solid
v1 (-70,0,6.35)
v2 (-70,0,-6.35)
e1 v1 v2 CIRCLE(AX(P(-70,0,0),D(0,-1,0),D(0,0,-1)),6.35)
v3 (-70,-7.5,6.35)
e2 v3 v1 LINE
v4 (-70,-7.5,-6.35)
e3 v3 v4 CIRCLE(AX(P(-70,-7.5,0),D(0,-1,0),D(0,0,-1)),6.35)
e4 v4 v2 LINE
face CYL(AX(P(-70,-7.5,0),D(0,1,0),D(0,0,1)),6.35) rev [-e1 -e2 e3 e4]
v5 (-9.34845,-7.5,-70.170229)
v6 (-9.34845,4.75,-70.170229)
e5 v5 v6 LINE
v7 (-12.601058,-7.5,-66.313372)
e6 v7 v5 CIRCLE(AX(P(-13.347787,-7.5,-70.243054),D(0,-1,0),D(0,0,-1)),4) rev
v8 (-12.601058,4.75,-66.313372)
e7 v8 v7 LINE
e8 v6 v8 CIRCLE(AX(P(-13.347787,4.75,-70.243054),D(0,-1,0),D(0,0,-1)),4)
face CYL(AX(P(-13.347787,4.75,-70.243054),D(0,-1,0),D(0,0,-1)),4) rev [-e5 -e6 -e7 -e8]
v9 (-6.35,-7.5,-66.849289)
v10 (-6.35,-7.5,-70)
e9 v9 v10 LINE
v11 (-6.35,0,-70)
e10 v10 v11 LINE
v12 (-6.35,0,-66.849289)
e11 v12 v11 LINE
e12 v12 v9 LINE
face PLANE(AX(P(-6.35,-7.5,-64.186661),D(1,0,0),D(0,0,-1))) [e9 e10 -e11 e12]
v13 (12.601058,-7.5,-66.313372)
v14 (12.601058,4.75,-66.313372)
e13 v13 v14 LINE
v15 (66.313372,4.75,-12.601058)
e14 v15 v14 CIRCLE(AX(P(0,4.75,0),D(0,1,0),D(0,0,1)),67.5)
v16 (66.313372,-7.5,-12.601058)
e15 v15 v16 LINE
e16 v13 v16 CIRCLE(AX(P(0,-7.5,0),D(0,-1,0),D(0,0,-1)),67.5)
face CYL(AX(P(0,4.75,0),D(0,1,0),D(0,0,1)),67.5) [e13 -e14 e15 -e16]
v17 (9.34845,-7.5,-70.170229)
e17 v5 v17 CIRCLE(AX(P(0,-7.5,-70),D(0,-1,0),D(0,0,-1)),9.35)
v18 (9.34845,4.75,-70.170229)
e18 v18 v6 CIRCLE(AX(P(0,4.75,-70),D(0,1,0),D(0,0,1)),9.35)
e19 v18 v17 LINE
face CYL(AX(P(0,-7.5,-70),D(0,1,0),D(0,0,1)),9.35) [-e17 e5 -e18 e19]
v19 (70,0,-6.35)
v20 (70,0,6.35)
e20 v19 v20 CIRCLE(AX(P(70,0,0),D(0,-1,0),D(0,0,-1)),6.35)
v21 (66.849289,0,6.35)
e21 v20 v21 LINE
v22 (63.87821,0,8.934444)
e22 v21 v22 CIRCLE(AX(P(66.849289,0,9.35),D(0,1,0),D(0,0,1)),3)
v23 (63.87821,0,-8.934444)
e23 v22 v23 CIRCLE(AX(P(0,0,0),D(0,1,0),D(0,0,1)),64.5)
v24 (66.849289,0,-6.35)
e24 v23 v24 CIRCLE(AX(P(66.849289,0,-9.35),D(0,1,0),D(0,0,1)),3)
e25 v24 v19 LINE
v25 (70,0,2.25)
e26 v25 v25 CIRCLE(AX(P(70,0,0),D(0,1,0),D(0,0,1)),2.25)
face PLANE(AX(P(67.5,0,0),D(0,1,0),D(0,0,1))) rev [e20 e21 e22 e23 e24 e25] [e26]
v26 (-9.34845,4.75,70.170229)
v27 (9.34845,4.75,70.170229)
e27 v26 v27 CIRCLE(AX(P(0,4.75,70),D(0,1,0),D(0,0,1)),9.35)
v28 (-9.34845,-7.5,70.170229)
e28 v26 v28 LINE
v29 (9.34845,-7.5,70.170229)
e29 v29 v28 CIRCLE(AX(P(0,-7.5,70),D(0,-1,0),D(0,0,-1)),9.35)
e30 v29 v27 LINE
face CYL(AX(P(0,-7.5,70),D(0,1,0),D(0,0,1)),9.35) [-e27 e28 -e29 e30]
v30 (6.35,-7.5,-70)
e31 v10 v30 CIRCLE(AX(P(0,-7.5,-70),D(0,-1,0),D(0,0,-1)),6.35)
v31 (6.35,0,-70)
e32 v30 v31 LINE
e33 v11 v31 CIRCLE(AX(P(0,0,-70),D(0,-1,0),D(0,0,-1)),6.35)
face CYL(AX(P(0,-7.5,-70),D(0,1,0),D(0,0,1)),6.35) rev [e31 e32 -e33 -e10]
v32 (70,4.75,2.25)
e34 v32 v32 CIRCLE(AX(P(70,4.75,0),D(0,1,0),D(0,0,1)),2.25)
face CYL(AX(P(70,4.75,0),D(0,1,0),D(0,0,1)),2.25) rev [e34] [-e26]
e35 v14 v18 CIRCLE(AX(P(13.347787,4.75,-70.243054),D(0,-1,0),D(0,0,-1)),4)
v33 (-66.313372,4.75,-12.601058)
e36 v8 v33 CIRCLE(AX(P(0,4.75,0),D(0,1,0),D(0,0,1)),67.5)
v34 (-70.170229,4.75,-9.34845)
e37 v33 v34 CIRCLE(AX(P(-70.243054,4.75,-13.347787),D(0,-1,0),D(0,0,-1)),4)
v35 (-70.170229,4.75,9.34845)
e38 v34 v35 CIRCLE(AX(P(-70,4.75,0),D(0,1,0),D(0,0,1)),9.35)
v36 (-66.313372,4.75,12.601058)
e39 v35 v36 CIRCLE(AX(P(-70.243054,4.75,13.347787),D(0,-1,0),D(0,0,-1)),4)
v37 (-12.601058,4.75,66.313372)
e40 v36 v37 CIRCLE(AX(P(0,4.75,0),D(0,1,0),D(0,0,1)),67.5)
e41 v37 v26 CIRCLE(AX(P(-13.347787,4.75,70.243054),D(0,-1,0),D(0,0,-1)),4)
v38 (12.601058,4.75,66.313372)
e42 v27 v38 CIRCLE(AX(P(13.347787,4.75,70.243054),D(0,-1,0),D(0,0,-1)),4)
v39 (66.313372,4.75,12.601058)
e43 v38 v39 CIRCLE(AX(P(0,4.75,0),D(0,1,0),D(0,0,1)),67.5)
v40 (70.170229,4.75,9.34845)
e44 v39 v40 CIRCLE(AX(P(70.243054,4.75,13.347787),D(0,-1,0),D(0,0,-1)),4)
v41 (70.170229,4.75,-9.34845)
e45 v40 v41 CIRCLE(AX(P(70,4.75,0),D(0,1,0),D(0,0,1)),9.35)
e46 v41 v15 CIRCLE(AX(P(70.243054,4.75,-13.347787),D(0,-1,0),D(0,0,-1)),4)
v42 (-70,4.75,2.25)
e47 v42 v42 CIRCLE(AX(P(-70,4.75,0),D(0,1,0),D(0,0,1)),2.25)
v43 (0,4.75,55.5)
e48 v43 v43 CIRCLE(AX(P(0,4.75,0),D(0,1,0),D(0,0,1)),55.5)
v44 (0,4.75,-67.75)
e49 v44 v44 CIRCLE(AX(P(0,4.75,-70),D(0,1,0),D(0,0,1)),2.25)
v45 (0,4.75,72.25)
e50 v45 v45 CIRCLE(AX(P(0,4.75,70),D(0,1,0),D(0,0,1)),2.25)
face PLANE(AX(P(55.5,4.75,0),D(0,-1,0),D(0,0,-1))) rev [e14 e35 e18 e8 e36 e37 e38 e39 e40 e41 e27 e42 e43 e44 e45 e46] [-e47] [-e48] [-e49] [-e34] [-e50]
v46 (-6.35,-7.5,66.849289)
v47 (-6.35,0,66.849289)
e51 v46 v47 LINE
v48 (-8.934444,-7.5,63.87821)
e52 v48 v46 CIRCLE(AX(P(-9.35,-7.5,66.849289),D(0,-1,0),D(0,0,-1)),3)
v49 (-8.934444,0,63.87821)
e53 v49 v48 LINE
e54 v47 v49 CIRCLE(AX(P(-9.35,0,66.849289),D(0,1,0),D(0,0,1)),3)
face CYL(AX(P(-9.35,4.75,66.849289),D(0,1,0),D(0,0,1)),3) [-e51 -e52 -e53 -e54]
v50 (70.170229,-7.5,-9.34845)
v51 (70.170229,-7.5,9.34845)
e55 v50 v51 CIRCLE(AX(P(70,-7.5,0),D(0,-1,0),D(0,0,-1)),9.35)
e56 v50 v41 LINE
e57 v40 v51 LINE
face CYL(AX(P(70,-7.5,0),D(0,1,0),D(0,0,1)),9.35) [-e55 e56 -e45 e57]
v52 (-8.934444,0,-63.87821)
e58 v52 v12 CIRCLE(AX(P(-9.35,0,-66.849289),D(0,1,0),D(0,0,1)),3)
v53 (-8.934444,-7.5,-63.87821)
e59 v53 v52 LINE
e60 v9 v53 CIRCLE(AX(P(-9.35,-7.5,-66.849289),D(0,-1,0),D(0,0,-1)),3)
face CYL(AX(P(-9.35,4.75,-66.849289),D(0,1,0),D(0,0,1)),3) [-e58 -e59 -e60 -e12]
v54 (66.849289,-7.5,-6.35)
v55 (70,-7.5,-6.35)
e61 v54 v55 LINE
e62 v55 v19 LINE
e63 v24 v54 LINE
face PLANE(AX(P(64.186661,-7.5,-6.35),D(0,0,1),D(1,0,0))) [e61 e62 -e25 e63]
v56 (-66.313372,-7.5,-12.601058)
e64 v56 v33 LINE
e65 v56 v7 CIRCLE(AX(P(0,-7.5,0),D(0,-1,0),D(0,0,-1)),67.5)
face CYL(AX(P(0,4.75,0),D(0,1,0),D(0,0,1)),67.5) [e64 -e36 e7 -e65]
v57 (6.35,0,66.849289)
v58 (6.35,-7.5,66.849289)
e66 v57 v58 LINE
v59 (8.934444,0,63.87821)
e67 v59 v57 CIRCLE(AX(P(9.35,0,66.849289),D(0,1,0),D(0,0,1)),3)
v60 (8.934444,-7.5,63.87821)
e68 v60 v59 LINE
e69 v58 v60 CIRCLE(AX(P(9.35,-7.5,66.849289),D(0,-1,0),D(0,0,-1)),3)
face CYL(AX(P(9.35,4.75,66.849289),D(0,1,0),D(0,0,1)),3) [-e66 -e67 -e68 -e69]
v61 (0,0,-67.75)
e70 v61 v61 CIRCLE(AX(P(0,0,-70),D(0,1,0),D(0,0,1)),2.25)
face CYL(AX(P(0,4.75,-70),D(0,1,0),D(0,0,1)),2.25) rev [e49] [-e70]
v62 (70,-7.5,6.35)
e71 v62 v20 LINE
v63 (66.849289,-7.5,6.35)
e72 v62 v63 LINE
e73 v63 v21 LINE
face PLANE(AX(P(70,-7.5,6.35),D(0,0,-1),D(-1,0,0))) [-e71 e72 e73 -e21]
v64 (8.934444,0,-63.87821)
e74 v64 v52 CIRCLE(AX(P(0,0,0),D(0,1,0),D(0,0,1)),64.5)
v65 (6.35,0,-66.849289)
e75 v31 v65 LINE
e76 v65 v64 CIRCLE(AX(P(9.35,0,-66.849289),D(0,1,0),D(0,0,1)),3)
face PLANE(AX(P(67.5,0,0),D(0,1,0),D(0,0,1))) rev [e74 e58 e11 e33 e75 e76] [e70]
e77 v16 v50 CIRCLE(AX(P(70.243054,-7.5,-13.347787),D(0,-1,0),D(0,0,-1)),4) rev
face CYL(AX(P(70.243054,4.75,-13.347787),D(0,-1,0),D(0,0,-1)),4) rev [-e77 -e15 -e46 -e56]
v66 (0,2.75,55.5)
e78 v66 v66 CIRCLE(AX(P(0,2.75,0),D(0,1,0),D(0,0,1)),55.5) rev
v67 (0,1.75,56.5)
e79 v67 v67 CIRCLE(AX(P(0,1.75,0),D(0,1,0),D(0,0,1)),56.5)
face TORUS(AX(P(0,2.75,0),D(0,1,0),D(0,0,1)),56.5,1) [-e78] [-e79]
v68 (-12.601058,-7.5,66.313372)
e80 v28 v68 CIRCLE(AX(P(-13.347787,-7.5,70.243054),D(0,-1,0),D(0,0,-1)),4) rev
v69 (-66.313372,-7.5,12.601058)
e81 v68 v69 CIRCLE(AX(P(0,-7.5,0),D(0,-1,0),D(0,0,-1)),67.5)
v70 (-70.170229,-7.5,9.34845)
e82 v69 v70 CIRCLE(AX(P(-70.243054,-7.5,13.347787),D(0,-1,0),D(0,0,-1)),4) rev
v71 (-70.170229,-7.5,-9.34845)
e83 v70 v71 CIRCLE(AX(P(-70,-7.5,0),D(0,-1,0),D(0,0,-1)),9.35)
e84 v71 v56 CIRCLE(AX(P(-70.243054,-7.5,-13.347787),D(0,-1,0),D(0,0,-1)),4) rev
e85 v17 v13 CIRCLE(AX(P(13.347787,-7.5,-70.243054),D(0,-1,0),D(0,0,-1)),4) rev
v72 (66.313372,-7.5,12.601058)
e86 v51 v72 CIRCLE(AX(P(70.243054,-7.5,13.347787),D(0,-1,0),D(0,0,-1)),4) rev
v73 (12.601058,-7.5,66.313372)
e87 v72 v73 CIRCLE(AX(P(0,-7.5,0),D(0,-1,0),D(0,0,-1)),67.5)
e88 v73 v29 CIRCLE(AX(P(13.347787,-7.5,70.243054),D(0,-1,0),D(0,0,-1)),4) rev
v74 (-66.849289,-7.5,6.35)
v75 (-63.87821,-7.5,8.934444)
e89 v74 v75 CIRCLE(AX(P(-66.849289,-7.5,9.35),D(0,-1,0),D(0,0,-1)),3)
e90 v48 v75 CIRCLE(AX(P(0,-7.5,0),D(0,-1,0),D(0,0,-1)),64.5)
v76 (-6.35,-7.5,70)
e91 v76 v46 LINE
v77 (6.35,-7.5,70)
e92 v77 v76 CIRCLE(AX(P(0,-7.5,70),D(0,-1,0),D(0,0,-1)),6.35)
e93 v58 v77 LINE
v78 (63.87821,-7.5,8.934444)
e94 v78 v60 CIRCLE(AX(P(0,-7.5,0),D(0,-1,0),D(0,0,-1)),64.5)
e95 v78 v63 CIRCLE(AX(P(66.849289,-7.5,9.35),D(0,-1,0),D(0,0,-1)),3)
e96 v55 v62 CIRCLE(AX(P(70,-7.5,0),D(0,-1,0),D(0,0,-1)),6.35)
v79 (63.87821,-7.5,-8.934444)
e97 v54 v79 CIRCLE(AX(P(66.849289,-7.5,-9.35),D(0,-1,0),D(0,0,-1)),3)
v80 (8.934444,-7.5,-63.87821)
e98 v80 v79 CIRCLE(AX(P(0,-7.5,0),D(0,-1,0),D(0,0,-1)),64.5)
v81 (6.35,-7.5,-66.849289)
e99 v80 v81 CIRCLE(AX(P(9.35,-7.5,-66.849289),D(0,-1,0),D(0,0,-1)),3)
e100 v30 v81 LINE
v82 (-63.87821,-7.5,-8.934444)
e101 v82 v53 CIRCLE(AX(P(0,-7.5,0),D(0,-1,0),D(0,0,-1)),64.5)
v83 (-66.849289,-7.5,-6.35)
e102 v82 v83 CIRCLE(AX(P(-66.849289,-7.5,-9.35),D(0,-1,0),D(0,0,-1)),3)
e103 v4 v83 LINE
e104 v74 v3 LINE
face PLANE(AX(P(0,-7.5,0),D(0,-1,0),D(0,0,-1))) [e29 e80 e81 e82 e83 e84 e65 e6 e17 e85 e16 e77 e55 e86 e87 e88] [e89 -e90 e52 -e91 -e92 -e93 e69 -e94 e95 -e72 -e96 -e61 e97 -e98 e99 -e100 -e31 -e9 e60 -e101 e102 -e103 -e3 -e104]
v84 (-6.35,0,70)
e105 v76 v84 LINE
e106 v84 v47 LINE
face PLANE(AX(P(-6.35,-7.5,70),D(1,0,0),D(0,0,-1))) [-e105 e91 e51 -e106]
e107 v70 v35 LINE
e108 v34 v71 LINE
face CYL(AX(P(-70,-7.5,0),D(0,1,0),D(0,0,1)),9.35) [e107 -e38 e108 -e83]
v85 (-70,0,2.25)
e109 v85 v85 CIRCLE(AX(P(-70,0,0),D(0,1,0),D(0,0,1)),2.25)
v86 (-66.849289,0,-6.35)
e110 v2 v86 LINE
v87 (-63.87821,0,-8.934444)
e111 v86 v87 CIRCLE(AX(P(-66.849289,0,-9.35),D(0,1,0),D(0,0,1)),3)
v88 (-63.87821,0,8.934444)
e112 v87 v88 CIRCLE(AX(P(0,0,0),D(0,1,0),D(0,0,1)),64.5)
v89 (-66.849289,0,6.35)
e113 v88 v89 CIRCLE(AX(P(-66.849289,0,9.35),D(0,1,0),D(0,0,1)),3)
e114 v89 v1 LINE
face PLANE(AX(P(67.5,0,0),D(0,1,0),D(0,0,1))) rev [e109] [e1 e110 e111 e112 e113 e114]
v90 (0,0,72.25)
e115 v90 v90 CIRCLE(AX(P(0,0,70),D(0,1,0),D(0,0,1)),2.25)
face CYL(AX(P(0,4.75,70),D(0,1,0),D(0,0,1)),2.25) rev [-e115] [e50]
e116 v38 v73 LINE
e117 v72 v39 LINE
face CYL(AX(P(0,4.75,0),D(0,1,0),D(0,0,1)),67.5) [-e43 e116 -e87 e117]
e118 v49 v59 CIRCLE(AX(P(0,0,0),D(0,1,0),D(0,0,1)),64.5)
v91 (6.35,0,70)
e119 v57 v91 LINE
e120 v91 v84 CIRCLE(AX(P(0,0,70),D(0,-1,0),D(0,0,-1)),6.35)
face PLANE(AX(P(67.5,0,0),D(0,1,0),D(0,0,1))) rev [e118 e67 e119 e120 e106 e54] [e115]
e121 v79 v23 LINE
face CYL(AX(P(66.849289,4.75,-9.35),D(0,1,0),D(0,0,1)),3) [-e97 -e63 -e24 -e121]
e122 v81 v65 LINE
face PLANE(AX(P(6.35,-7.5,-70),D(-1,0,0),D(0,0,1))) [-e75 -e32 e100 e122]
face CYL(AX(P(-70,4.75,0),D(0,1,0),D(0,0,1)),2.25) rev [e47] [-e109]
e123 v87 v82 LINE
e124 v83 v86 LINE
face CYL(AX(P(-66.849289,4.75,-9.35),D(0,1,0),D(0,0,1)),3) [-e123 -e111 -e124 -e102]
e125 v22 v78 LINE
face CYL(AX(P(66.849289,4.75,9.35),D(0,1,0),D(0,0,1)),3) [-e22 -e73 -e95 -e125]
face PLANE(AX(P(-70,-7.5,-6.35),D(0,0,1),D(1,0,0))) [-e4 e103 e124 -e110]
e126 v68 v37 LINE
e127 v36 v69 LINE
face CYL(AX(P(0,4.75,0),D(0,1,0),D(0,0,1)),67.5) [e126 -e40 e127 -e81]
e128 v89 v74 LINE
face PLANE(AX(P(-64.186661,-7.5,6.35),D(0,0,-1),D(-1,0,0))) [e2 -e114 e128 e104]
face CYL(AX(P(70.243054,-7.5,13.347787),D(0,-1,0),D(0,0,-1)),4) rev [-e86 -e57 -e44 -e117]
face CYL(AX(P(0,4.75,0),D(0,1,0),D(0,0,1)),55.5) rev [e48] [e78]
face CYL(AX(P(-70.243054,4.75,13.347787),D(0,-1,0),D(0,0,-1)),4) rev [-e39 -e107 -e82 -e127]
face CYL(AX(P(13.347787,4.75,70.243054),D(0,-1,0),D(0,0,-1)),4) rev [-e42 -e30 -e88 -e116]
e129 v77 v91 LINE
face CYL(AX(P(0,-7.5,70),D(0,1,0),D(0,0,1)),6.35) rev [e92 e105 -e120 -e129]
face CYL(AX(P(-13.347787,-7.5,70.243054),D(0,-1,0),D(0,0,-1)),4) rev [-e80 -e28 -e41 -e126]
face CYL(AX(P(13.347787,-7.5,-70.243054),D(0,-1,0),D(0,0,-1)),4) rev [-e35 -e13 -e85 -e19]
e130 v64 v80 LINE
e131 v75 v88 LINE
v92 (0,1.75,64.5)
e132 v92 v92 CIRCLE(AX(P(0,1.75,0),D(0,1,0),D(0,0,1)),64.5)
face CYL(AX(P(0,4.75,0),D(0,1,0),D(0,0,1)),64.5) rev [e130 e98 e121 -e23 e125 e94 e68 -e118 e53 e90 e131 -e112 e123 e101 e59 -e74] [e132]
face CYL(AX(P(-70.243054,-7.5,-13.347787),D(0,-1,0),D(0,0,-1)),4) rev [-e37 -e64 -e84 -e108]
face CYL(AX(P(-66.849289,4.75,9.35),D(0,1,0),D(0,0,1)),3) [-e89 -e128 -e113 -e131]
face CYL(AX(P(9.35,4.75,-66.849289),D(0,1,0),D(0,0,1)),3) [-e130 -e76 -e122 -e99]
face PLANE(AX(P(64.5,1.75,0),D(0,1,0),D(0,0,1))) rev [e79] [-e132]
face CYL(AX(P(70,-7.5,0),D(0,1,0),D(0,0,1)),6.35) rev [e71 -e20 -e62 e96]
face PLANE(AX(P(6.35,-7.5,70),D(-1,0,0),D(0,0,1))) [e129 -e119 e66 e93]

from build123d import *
from build123d.topology import SkipClean

# Parameters (mm, degrees)
FILLET1_R                = 1
BOSS_EXTRUDE1_DEPTH      = 4.75
FILLET2_R                = 2
M4_CLEARANCE_HOLE1_D     = 4.5
CIRPATTERN3_COUNT        = 4
FILLET2_OF_CIRPATTERN3_R = 2
BOSS_EXTRUDE2_START      = 7.5
BOSS_EXTRUDE2_DEPTH      = 7.5
BOSS_EXTRUDE3_START      = -4.75
SKETCH10_R               = 2.25
BOSS_EXTRUDE3_DEPTH      = 4.75
FILLET3_R                = 4
FILLET4_R                = 3


with BuildPart() as part:
    # Sketch1 → Revolve1 (revolve)
    with BuildSketch(Plane.XY, mode=Mode.PRIVATE) as revolve1_sk:
        Polygon((64.5, 0), (64.5, 1.75), (55.5, 1.75), (55.5, 4.75), (67.5, 4.75), (67.5, 0), align=None)
    revolve(revolve1_sk.sketch.rotate(Axis((0, 4.75, 0), (0, -1, 0)), 90), axis=Axis((0, 4.75, 0), (0, -1, 0)))

    # Fillet1
    fillet1_edges = [part.edges().sort_by_distance(p)[0] for p in [
        (0, 1.75, -55.5),
    ]]
    fillet(fillet1_edges, radius=FILLET1_R)

    # Sketch2 → Boss-Extrude1 (add)
    with BuildSketch(Plane(origin=(0, 4.75, 0), x_dir=(1, 0, 0), z_dir=(0, 1, 0))):
        with BuildLine():
            Line((67.232804493, 6), (70, 6))
            ThreePointArc((70, 6), (76, 0), (70, -6))
            Line((70, -6), (67.232804493, -6))
            Line((67.232804493, -6), (67.232804493, 6))
        make_face()
    boss_extrude1 = extrude(amount=-BOSS_EXTRUDE1_DEPTH)

    # Fillet2
    fillet2_edges = [part.edges().sort_by_distance(p)[0] for p in [
        (67.232804493, 2.375, 6),
        (67.232804493, 2.375, -6),
    ]]
    fillet(fillet2_edges, radius=FILLET2_R)

    # M4 Clearance Hole1 (through all)
    with Locations(Plane(origin=(0, 4.75, 0), x_dir=(1, 0, 0), z_dir=(0, 1, 0))):
        with Locations((70, 0)):
            m4_clearance_hole1 = Hole(M4_CLEARANCE_HOLE1_D / 2)

    # CirPattern3: Boss-Extrude1, M4 Clearance Hole1 ×4 about axis
    cirpattern3_axis = Axis((0, 0, 0), (0, 1, 0))
    add([boss_extrude1.rotate(cirpattern3_axis, i * 360 / CIRPATTERN3_COUNT) for i in range(1, CIRPATTERN3_COUNT)])
    add([m4_clearance_hole1.rotate(cirpattern3_axis, i * 360 / CIRPATTERN3_COUNT) for i in range(1, CIRPATTERN3_COUNT)], mode=Mode.SUBTRACT)

    # Fillet2 of CirPattern3
    fillet2_of_cirpattern3_edges = [part.edges().sort_by_distance(p)[0] for p in [
        (6, 2.375, -67.232804493),
        (-6, 2.375, -67.232804493),
        (-67.232804493, 2.375, -6),
        (-67.232804493, 2.375, 6),
        (-6, 2.375, 67.232804493),
        (6, 2.375, 67.232804493),
    ]]
    fillet(fillet2_of_cirpattern3_edges, radius=FILLET2_OF_CIRPATTERN3_R)

    # Sketch9 → Boss-Extrude2 (add)
    with SkipClean():  # the faces are left unmerged after this step: merging them gives an invalid solid
        with BuildSketch(Plane.XZ.offset(BOSS_EXTRUDE2_START)):
            with BuildLine():
                Line((9.35, 70), (9.35, 66.84928945))
                ThreePointArc((9.35, 66.84928945), (47.72970773, 47.72970773), (66.84928945, 9.35))
                Line((66.84928945, 9.35), (70, 9.35))
                ThreePointArc((70, 9.35), (79.35, 0), (70, -9.35))
                Line((70, -9.35), (66.84928945, -9.35))
                ThreePointArc((66.84928945, -9.35), (47.72970773, -47.72970773), (9.35, -66.84928945))
                Line((9.35, -66.84928945), (9.35, -70))
                ThreePointArc((9.35, -70), (0, -79.35), (-9.35, -70))
                Line((-9.35, -70), (-9.35, -66.84928945))
                ThreePointArc((-9.35, -66.84928945), (-47.72970773, -47.72970773), (-66.84928945, -9.35))
                Line((-66.84928945, -9.35), (-70, -9.35))
                ThreePointArc((-70, -9.35), (-79.35, 0), (-70, 9.35))
                Line((-70, 9.35), (-66.84928945, 9.35))
                ThreePointArc((-66.84928945, 9.35), (-47.72970773, 47.72970773), (-9.35, 66.84928945))
                Line((-9.35, 66.84928945), (-9.35, 70))
                ThreePointArc((-9.35, 70), (0, 79.35), (9.35, 70))
            make_face()
            with BuildLine():
                Line((6.35, 70), (6.35, 64.186661387))
                ThreePointArc((6.35, 64.186661387), (6.887471884, 64.131214951), (7.424460432, 64.071268033))
                ThreePointArc((7.424460432, 64.071268033), (45.608387387, 45.608387387), (64.071268033, 7.424460432))
                ThreePointArc((64.071268033, 7.424460432), (64.131214951, 6.887471884), (64.186661387, 6.35))
                Line((64.186661387, 6.35), (70, 6.35))
                ThreePointArc((70, 6.35), (76.35, 0), (70, -6.35))
                Line((70, -6.35), (64.186661387, -6.35))
                ThreePointArc((64.186661387, -6.35), (45.608387387, -45.608387387), (6.35, -64.186661387))
                Line((6.35, -64.186661387), (6.35, -70))
                ThreePointArc((6.35, -70), (0, -76.35), (-6.35, -70))
                Line((-6.35, -70), (-6.35, -64.186661387))
                ThreePointArc((-6.35, -64.186661387), (-6.887471884, -64.131214951), (-7.424460432, -64.071268033))
                ThreePointArc((-7.424460432, -64.071268033), (-45.608387387, -45.608387387), (-64.071268033, -7.424460432))
                ThreePointArc((-64.071268033, -7.424460432), (-64.131214951, -6.887471884), (-64.186661387, -6.35))
                Line((-64.186661387, -6.35), (-70, -6.35))
                ThreePointArc((-70, -6.35), (-76.35, 0), (-70, 6.35))
                Line((-70, 6.35), (-64.186661387, 6.35))
                ThreePointArc((-64.186661387, 6.35), (-45.608387387, 45.608387387), (-6.35, 64.186661387))
                Line((-6.35, 64.186661387), (-6.35, 70))
                ThreePointArc((-6.35, 70), (0, 76.35), (6.35, 70))
            make_face(mode=Mode.SUBTRACT)
        extrude(amount=-BOSS_EXTRUDE2_DEPTH)

    # Sketch10 → Boss-Extrude3 (add)
    # profile 1 of 4: a face of its own
    with SkipClean():  # the faces are left unmerged after this step: merging them gives an invalid solid
        with BuildSketch(Plane(origin=(0, 4.75, 0), x_dir=(1, 0, 0), z_dir=(0, 1, 0)).offset(BOSS_EXTRUDE3_START)):
            with BuildLine():
                Line((9.35, -70), (9.35, -66.84928945))
                ThreePointArc((9.35, -66.84928945), (8.560488148, -66.954970261), (7.769784173, -67.051327011))
                ThreePointArc((7.769784173, -67.051327011), (-0.796539584, -67.495300019), (-9.35, -66.84928945))
                Line((-9.35, -66.84928945), (-9.35, -70))
                ThreePointArc((-9.35, -70), (0, -79.35), (9.35, -70))
            make_face()
            with Locations(Location((0, -70, 0), (0, 0, 270))):
                Circle(SKETCH10_R, mode=Mode.SUBTRACT)
        # profile 2 of 4: a face of its own
        with BuildSketch(Plane(origin=(0, 4.75, 0), x_dir=(1, 0, 0), z_dir=(0, 1, 0)).offset(BOSS_EXTRUDE3_START)):
            with BuildLine():
                Line((-70, -9.35), (-66.84928945, -9.35))
                ThreePointArc((-66.84928945, -9.35), (-67.495300019, -0.796539584), (-67.051327011, 7.769784173))
                ThreePointArc((-67.051327011, 7.769784173), (-66.954970261, 8.560488148), (-66.84928945, 9.35))
                Line((-66.84928945, 9.35), (-70, 9.35))
                ThreePointArc((-70, 9.35), (-79.35, 0), (-70, -9.35))
            make_face()
            with Locations(Location((-70, 0, 0), (0, 0, 270))):
                Circle(SKETCH10_R, mode=Mode.SUBTRACT)
        # profile 3 of 4: a face of its own
        with BuildSketch(Plane(origin=(0, 4.75, 0), x_dir=(1, 0, 0), z_dir=(0, 1, 0)).offset(BOSS_EXTRUDE3_START)):
            with BuildLine():
                Line((66.84928945, -9.35), (70, -9.35))
                ThreePointArc((70, -9.35), (79.35, 0), (70, 9.35))
                Line((70, 9.35), (66.84928945, 9.35))
                ThreePointArc((66.84928945, 9.35), (67.495300019, 0.796539584), (67.051327011, -7.769784173))
                ThreePointArc((67.051327011, -7.769784173), (66.954970261, -8.560488148), (66.84928945, -9.35))
            make_face()
            with Locations(Location((70, 0, 0), (0, 0, 270))):
                Circle(SKETCH10_R, mode=Mode.SUBTRACT)
        # profile 4 of 4: a face of its own
        with BuildSketch(Plane(origin=(0, 4.75, 0), x_dir=(1, 0, 0), z_dir=(0, 1, 0)).offset(BOSS_EXTRUDE3_START)):
            with BuildLine():
                Line((-9.35, 70), (-9.35, 66.84928945))
                ThreePointArc((-9.35, 66.84928945), (-0.796539584, 67.495300019), (7.769784173, 67.051327011))
                ThreePointArc((7.769784173, 67.051327011), (8.560488148, 66.954970261), (9.35, 66.84928945))
                Line((9.35, 66.84928945), (9.35, 70))
                ThreePointArc((9.35, 70), (0, 79.35), (-9.35, 70))
            make_face()
            with Locations(Location((0, 70, 0), (0, 0, 270))):
                Circle(SKETCH10_R, mode=Mode.SUBTRACT)
        extrude(amount=BOSS_EXTRUDE3_DEPTH)

    # Fillet3
    # the kernel refuses this fillet: 4 mm, written as the material it adds along each edge
    with BuildSketch(Plane(origin=(9.35, -7.5, -66.84928945), x_dir=(0.9866840130095414, 0, 0.1626488809410843), z_dir=(0, 1, 0)), Plane(origin=(-66.84928945, -7.5, -9.35), x_dir=(0.16264888094108318, 0, -0.9866840130095416), z_dir=(0, 1, 0)), Plane(origin=(66.84928945, -7.5, 9.35), x_dir=(-0.16264888094108712, 0, 0.986684013009541), z_dir=(0, 1, 0))) as fillet3_piece_1:
        with BuildLine():
            CenterArc((3.392560849, 3.998808428), FILLET3_R, 190.403879818, 78.197568224)
            Line((-0.54167613, 3.276465436), (-0.935099828, 3.204231137))
            ThreePointArc((-0.935099828, 3.204231137), (-0.90713315, 3.043696177), (-0.394673605, -0.065059552))
            Line((-0.394673605, -0.065059552), (0.009762765, -0.399880843))
            ThreePointArc((0.009762765, -0.399880843), (1.647466599, -0.379892218), (3.285170433, -0.399880843))
            Line((3.285170433, -0.399880843), (3.294933198, 0))
        make_face()
    extrude(amount=7.5)
    with BuildSketch(Plane(origin=(-9.35, -7.5, -66.84928945), x_dir=(0.00046665737590304566, 0, -0.9999998911154409), z_dir=(0, 1, 0)), Plane(origin=(-66.84928945, -7.5, 9.35), x_dir=(-0.9999998911154409, 0, -0.00046665737590358055), z_dir=(0, 1, 0)), Plane(origin=(9.35, -7.5, 66.84928945), x_dir=(-0.00046665737546071475, 0, 0.999999891115441), z_dir=(0, 1, 0)), Plane(origin=(66.84928945, -7.5, -9.35), x_dir=(0.9999998911154409, 0, 0.00046665737590465234), z_dir=(0, 1, 0))) as fillet3_piece_2:
        with BuildLine():
            CenterArc((3.391898155, 3.999370558), FILLET3_R, 190.785969778, 78.197568224)
            Line((-0.537434269, 3.250807467), (-0.930367512, 3.175951158))
            ThreePointArc((-0.930367512, 3.175951158), (-0.643521838, 1.563439777), (-0.396118038, -0.055592265))
            Line((-0.396118038, -0.055592265), (0.000186663, -0.399999956))
            ThreePointArc((0.000186663, -0.399999956), (3.15089687, -0.398529654), (3.313843571, -0.399937056))
            Line((3.313843571, -0.399937056), (3.320939443, 0))
        make_face()
    extrude(amount=7.5)
    with BuildSketch(Plane(origin=(-9.35, -7.5, 66.84928945), x_dir=(0.00046665737590197983, 0, 0.9999998911154409), z_dir=(0, 1, 0))) as fillet3_piece_3:
        with BuildLine():
            CenterArc((3.391898155, -3.999370558), FILLET3_R, 91.016461998, 78.197568224)
            Line((-0.537434269, -3.250807467), (-0.930367512, -3.175951158))
            ThreePointArc((-0.930367512, -3.175951158), (-0.643521838, -1.563439777), (-0.396118038, 0.055592265))
            Line((-0.396118038, 0.055592265), (0.000186663, 0.399999956))
            ThreePointArc((0.000186663, 0.399999956), (3.15089687, 0.398529654), (3.313843571, 0.399937056))
            Line((3.313843571, 0.399937056), (3.320939443, 0))
        make_face()
    extrude(amount=7.5)
    with BuildSketch(Plane(origin=(66.84928945, 0, -9.35), x_dir=(0.9999998911154409, 0, 0.00046665737590465234), z_dir=(0, 1, 0)), Plane(origin=(9.35, 0, 66.84928945), x_dir=(-0.00046665737546125165, 0, 0.999999891115441), z_dir=(0, 1, 0)), Plane(origin=(-66.84928945, 0, 9.35), x_dir=(-0.9999998911154409, 0, -0.0004666573759035825), z_dir=(0, 1, 0)), Plane(origin=(-9.35, 0, -66.84928945), x_dir=(0.0004666573759025147, 0, -0.9999998911154409), z_dir=(0, 1, 0))) as fillet3_piece_4:
        with BuildLine():
            CenterArc((3.391898155, 3.999370558), FILLET3_R, 190.785969778, 78.197568224)
            Line((-0.537434269, 3.250807467), (-0.930367512, 3.175951158))
            ThreePointArc((-0.930367512, 3.175951158), (-0.643521838, 1.563439777), (-0.396118038, -0.055592265))
            Line((-0.396118038, -0.055592265), (0.000186663, -0.399999956))
            ThreePointArc((0.000186663, -0.399999956), (3.15089687, -0.398529654), (3.313843571, -0.399937056))
            Line((3.313843571, -0.399937056), (3.320939443, 0))
        make_face()
    extrude(amount=4.75)
    with BuildSketch(Plane(origin=(66.84928945, 0, 9.35), x_dir=(-0.16264888094109056, 0, 0.9866840130095405), z_dir=(0, 1, 0)), Plane(origin=(-66.84928945, 0, -9.35), x_dir=(0.16264888094108695, 0, -0.986684013009541), z_dir=(0, 1, 0)), Plane(origin=(9.35, 0, -66.84928945), x_dir=(0.9866840130095401, 0, 0.16264888094109253), z_dir=(0, 1, 0))) as fillet3_piece_5:
        with BuildLine():
            CenterArc((3.392560849, 3.998808428), FILLET3_R, 190.403879818, 78.197568224)
            Line((-0.54167613, 3.276465436), (-0.935099828, 3.204231137))
            ThreePointArc((-0.935099828, 3.204231137), (-0.90713315, 3.043696177), (-0.394673605, -0.065059552))
            Line((-0.394673605, -0.065059552), (0.009762765, -0.399880843))
            ThreePointArc((0.009762765, -0.399880843), (1.647466599, -0.379892218), (3.285170433, -0.399880843))
            Line((3.285170433, -0.399880843), (3.294933198, 0))
        make_face()
    extrude(amount=4.75)
    with BuildSketch(Plane(origin=(-9.35, 0, 66.84928945), x_dir=(0.0004666573759067919, 0, 0.9999998911154409), z_dir=(0, 1, 0))) as fillet3_piece_6:
        with BuildLine():
            CenterArc((3.391898155, -3.999370558), FILLET3_R, 91.016461998, 78.197568224)
            Line((-0.537434269, -3.250807467), (-0.930367512, -3.175951158))
            ThreePointArc((-0.930367512, -3.175951158), (-0.643521838, -1.563439777), (-0.396118038, 0.055592265))
            Line((-0.396118038, 0.055592265), (0.000186663, 0.399999956))
            ThreePointArc((0.000186663, 0.399999956), (3.15089687, 0.398529654), (3.313843571, 0.399937056))
            Line((3.313843571, 0.399937056), (3.320939443, 0))
        make_face()
    extrude(amount=4.75)

    # Fillet4
    # the kernel refuses this fillet: 3 mm, written as the material it takes off along each edge
    with BuildSketch(Plane(origin=(6.35, -14.156570159, 64.186661387), x_dir=(0, 0, 1), z_dir=(0, 1, 0))) as fillet4_piece_1:
        with BuildLine():
            CenterArc((2.662628063, 3), FILLET4_R, 187.962128364, 82.037871636)
            ThreePointArc((-0.308451468, 2.584444444), (-0.141188058, 1.293778259), (0, 0))
            Line((0, 0), (2.662628063, 0))
        make_face()
    extrude(amount=14.156570159, mode=Mode.SUBTRACT)
    with BuildSketch(Plane(origin=(-6.35, -14.156570158, 64.186661387), x_dir=(-0.9929530748674341, 0, -0.11850819006004458), z_dir=(0, 1, 0)), Plane(origin=(6.35, -14.156570158, -64.186661387), x_dir=(0.9929530748674334, 0, 0.11850819006005012), z_dir=(0, 1, 0))) as fillet4_piece_2:
        with BuildLine():
            CenterArc((2.663315992, 2.999389293), FILLET4_R, 186.806013808, 82.037871636)
            Line((-0.315543233, 2.643864723), (0, 0))
            ThreePointArc((0, 0), (1.301393042, 0.013130203), (2.602786083, 0))
        make_face()
    extrude(amount=14.156570158, mode=Mode.SUBTRACT)
    with BuildSketch(Plane(origin=(-64.186661387, -14.156570158, 6.35), x_dir=(0.11850819006005611, 0, 0.9929530748674328), z_dir=(0, 1, 0)), Plane(origin=(64.186661387, -14.156570158, -6.35), x_dir=(-0.11850819006006143, 0, -0.9929530748674322), z_dir=(0, 1, 0))) as fillet4_piece_3:
        with BuildLine():
            CenterArc((2.663315992, -2.999389293), FILLET4_R, 91.156114556, 82.037871636)
            Line((-0.315543233, -2.643864723), (0, 0))
            ThreePointArc((0, 0), (1.301393042, -0.013130203), (2.602786083, 0))
        make_face()
    extrude(amount=14.156570158, mode=Mode.SUBTRACT)
    with BuildSketch(Plane(origin=(-64.186661387, -14.156570158, -6.35), x_dir=(-1, 0, 0), z_dir=(0, 1, 0)), Plane(origin=(64.186661387, -14.156570158, 6.35), x_dir=(1, 0, 0), z_dir=(0, 1, 0))) as fillet4_piece_4:
        with BuildLine():
            CenterArc((2.662628063, -3), FILLET4_R, 90, 82.037871636)
            ThreePointArc((-0.308451468, -2.584444444), (-0.141188058, -1.293778259), (0, 0))
            Line((0, 0), (2.662628063, 0))
        make_face()
    extrude(amount=14.156570158, mode=Mode.SUBTRACT)
    with BuildSketch(Plane(origin=(-6.35, -14.156570159, -64.186661387), x_dir=(-0.9929530748668933, 0, 0.11850819006457661), z_dir=(0, 1, 0))) as fillet4_piece_5:
        with BuildLine():
            CenterArc((2.663315992, -2.999389293), FILLET4_R, 91.156114556, 82.037871636)
            Line((-0.315543233, -2.643864723), (0, 0))
            ThreePointArc((0, 0), (1.301393042, -0.013130203), (2.602786083, 0))
        make_face()
    extrude(amount=14.156570159, mode=Mode.SUBTRACT)


solid = part.part
